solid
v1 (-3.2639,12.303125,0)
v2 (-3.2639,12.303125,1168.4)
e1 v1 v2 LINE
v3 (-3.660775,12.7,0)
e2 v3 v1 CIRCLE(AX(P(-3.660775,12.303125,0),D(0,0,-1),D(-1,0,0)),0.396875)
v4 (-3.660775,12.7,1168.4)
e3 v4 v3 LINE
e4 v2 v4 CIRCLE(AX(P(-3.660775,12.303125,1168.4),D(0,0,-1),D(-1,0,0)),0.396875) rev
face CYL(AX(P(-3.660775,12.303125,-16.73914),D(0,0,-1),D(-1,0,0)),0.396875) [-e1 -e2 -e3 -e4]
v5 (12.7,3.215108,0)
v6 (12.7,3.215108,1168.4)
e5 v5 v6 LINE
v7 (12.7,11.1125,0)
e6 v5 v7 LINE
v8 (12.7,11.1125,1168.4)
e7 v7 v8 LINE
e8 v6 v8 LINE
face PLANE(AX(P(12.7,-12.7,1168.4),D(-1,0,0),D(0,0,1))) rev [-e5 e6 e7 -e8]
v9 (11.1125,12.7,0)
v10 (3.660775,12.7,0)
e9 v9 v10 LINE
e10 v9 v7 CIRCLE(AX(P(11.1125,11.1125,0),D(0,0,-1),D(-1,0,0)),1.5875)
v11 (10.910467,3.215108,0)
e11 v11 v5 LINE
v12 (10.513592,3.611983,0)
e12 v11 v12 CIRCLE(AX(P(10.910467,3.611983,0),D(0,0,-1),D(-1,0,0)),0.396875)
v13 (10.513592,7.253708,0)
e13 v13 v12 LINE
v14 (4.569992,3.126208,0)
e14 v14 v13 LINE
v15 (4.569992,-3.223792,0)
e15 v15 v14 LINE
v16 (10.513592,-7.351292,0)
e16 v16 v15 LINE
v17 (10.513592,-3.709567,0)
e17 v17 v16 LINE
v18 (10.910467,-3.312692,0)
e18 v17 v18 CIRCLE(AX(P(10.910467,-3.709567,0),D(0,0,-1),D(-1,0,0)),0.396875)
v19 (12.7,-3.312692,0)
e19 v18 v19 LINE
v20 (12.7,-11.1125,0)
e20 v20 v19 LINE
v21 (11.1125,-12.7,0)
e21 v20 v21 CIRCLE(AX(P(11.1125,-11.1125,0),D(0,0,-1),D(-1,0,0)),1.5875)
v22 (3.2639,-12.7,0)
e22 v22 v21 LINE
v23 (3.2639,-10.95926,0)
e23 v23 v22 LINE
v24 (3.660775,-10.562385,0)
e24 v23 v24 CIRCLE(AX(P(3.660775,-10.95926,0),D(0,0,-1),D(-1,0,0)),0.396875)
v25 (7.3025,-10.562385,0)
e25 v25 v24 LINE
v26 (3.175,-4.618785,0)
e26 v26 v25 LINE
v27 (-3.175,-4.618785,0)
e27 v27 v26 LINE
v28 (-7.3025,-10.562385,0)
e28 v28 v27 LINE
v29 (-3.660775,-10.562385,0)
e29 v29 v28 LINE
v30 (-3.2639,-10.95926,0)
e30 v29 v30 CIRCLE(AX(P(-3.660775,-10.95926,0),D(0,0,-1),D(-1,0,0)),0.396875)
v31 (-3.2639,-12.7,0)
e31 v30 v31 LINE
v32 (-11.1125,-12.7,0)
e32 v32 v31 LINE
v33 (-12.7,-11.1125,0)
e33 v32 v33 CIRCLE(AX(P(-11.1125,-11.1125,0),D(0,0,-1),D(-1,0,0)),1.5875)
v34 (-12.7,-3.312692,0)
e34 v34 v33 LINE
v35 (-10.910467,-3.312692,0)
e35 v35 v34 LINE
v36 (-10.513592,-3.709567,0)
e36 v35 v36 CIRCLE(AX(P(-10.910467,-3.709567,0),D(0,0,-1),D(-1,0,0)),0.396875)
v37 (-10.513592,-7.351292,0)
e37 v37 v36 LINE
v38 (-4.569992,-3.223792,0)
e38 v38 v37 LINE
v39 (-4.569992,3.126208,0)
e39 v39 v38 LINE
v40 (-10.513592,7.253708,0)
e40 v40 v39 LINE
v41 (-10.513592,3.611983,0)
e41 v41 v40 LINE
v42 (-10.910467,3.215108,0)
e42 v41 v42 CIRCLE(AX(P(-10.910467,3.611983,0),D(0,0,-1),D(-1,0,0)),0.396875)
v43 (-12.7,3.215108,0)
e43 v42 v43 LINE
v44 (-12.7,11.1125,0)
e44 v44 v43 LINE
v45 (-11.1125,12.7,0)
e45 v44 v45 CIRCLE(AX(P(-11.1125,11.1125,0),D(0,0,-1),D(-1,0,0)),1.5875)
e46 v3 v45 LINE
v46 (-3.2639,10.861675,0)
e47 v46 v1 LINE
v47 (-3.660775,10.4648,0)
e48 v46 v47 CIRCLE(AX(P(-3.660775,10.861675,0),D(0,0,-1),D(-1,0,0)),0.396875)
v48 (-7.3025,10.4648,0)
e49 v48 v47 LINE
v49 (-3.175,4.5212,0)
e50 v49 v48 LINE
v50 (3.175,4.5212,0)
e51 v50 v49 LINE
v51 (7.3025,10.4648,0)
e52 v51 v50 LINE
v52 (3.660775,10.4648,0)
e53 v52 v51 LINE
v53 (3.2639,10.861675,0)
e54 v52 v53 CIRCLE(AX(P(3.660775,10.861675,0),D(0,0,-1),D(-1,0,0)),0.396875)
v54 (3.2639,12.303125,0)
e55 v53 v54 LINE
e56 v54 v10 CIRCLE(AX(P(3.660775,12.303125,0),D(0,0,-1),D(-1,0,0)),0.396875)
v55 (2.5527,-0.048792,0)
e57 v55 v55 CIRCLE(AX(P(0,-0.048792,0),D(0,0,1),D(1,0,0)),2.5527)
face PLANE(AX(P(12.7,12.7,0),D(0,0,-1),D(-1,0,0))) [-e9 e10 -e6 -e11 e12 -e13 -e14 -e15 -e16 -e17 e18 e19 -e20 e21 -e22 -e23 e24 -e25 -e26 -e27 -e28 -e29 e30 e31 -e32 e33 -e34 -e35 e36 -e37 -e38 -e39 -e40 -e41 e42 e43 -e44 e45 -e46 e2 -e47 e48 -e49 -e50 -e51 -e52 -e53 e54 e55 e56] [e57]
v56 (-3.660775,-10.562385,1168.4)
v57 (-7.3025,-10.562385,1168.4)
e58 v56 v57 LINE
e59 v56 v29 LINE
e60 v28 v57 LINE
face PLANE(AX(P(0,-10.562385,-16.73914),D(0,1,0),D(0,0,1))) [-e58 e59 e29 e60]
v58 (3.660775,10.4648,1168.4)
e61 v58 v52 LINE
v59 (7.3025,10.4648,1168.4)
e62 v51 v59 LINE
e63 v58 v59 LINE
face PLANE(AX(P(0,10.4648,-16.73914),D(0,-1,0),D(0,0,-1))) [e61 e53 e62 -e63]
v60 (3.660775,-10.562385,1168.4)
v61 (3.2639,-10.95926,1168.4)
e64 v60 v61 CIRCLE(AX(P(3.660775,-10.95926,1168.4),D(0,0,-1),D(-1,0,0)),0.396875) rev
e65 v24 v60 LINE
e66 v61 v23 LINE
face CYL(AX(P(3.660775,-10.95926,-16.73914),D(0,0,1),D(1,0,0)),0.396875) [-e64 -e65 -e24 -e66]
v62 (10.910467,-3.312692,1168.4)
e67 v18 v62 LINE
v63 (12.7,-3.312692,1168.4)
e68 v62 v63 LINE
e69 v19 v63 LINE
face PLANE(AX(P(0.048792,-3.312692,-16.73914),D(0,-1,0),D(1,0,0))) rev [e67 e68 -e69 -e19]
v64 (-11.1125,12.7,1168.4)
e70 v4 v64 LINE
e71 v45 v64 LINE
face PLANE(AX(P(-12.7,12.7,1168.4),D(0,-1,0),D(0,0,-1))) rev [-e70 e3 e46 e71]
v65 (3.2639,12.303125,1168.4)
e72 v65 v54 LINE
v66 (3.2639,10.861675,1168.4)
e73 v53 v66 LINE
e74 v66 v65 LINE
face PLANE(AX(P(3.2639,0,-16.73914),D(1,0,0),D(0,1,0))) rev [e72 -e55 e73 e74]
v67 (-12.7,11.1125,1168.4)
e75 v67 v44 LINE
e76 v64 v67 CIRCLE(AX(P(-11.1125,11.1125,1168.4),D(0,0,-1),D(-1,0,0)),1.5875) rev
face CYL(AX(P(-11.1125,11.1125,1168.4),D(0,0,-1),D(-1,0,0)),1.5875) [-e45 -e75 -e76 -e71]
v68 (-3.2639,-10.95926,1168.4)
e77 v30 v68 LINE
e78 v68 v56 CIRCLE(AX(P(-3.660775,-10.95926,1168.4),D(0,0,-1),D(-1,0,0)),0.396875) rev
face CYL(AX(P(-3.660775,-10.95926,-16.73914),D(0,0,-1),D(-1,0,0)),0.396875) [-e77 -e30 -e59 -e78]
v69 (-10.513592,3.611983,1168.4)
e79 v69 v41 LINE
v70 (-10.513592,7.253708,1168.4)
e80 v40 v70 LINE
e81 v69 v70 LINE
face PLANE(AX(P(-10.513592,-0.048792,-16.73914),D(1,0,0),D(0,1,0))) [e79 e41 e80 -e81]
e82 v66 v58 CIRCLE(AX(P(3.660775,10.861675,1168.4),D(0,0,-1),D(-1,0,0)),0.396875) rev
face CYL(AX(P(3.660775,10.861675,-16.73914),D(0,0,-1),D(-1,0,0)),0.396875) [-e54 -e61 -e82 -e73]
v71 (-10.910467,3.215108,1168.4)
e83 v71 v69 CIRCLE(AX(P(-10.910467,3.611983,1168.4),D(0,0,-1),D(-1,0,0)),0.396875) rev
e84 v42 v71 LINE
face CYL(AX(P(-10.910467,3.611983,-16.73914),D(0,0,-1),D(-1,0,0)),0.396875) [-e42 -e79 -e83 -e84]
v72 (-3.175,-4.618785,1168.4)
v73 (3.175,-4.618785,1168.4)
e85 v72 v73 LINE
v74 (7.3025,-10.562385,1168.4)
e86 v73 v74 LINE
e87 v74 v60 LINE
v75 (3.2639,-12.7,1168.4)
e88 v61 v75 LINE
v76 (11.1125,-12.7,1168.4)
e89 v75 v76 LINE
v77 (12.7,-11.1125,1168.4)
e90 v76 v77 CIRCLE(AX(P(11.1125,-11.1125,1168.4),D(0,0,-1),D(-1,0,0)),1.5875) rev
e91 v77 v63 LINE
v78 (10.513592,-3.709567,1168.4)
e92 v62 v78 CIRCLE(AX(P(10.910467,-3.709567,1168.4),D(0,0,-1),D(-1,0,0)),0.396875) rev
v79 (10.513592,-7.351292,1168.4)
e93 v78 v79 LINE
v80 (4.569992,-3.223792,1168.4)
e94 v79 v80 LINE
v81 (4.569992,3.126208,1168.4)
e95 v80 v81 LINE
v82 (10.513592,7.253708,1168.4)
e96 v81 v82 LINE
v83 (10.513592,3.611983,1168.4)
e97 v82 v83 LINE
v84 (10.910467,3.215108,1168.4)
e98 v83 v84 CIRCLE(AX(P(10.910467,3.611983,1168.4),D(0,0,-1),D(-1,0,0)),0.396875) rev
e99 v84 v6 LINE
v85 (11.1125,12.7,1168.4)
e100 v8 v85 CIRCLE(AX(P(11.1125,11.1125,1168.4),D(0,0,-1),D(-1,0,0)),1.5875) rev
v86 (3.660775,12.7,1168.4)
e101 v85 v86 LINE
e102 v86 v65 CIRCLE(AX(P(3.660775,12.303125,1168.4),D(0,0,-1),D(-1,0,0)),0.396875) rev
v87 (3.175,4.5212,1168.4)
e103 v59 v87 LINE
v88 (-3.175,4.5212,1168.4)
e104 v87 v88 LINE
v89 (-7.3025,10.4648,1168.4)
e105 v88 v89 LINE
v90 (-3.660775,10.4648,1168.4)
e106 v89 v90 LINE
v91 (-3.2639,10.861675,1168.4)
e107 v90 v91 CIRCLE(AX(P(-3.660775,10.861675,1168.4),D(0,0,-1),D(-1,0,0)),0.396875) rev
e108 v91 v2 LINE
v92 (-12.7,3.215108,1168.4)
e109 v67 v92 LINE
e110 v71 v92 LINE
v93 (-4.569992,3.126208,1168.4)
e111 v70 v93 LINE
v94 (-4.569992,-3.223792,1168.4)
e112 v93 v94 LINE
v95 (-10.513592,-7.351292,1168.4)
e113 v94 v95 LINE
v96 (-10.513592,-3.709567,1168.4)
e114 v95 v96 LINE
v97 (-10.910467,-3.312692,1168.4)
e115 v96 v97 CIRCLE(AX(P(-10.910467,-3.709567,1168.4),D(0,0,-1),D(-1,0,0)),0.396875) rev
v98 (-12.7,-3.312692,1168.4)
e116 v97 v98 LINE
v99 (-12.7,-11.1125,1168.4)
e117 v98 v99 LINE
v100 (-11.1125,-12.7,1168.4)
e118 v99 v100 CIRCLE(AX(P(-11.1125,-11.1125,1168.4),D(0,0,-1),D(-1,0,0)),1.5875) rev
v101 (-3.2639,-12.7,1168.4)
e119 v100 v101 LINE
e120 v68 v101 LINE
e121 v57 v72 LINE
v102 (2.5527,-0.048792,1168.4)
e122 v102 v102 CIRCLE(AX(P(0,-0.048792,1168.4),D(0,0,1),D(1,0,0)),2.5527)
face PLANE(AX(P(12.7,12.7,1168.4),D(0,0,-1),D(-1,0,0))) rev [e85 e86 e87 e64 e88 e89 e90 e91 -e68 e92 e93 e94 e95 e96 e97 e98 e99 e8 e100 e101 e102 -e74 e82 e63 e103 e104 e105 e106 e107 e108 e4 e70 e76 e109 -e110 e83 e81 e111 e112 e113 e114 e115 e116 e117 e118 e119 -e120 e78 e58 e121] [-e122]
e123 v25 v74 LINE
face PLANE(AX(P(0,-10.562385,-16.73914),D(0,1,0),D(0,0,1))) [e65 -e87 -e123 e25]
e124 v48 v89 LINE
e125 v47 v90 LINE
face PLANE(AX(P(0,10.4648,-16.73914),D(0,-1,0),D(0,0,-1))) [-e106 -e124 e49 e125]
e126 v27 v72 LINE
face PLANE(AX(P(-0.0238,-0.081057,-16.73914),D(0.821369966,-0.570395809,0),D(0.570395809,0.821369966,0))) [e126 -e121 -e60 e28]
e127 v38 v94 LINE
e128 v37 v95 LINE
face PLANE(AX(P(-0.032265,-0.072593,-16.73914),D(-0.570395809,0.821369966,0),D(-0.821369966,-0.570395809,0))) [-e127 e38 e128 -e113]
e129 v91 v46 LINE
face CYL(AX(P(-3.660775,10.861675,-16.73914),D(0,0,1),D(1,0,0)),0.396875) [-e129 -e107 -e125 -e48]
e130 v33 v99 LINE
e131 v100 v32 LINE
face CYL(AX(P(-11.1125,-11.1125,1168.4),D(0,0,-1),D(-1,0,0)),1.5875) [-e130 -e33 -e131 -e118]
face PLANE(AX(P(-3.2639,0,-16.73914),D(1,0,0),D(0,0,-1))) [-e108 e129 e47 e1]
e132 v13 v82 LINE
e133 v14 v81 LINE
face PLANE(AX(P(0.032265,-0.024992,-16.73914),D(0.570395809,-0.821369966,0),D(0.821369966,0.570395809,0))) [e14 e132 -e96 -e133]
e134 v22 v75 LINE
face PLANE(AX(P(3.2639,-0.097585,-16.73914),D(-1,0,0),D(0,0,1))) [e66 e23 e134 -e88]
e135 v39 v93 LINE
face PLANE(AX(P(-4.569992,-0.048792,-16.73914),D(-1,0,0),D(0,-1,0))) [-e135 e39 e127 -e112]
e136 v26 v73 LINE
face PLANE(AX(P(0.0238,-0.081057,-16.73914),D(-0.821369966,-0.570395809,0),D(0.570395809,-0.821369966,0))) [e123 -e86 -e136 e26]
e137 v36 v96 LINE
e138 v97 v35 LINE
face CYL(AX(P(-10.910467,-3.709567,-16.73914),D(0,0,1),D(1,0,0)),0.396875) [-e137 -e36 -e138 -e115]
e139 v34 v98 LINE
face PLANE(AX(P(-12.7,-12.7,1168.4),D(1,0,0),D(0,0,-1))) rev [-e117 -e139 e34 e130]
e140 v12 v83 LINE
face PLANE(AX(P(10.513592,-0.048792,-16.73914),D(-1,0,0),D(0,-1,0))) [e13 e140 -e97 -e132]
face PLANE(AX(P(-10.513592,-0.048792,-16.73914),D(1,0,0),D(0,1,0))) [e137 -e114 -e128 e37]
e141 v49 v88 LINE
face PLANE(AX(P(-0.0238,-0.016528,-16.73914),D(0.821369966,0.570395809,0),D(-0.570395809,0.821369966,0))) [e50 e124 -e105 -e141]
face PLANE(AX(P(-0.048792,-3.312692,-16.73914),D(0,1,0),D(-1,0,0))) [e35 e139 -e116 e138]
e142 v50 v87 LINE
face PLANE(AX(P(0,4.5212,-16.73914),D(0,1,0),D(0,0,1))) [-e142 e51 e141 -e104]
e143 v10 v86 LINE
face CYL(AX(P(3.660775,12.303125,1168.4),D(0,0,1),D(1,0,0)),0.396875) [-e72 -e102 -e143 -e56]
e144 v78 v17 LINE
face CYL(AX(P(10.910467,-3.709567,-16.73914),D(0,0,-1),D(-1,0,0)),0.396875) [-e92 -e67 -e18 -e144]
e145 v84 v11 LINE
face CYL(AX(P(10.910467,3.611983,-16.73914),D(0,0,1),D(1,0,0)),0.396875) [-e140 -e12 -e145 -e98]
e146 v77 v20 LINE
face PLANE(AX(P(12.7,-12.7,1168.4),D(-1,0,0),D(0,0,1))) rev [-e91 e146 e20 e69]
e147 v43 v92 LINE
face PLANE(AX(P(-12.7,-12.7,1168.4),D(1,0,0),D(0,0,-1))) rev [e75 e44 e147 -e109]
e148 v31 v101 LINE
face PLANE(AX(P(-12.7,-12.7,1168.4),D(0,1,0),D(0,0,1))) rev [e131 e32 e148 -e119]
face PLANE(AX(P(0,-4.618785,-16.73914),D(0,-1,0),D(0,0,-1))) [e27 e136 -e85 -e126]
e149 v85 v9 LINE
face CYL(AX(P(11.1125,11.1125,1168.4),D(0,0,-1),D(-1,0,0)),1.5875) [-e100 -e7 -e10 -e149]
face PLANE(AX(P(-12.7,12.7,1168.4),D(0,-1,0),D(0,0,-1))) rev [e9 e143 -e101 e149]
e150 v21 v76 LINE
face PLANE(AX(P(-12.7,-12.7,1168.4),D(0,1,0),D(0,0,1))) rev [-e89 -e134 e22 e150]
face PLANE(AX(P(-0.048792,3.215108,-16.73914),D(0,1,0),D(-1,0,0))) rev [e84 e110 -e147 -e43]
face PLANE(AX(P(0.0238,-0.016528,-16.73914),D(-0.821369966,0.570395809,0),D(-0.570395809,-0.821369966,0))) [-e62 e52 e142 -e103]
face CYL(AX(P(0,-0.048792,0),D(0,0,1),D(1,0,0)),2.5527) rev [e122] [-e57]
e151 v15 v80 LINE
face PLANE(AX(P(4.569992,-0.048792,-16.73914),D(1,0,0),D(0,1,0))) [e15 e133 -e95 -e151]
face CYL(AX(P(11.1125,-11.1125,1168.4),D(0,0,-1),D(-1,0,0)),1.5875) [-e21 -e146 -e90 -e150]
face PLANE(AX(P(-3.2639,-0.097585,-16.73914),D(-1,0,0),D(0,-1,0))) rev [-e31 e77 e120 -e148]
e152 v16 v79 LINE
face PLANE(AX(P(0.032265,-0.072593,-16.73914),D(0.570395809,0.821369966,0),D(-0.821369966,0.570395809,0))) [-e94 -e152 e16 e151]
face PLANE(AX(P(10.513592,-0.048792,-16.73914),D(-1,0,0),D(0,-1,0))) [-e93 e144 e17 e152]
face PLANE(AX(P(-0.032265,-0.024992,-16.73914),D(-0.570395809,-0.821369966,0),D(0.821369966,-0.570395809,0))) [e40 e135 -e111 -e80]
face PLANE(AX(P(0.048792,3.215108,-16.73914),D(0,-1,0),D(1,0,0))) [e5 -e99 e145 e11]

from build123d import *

# Parameters (mm, degrees)
SKETCH1_W           = 25.4
SKETCH1_H           = 25.4
BOSS_EXTRUDE1_DEPTH = 1168.4
FILLET1_R           = 1.5875
HOLE1_OUTLINE_R     = 2.5527
HOLE1_DEPTH         = 1168.4
SKETCH7_W           = 6.5278
SKETCH7_H           = 2.2352
CUT_EXTRUDE2_DEPTH  = 1168.4
FILLET4_R           = 0.396875
CIRPATTERN2_DEPTH   = 1168.4


# Read off the part's stored shape, not the designer's step: Hole1, CirPattern2
with BuildPart() as part:
    # Sketch1 → Boss-Extrude1 (new body)
    with BuildSketch(Plane.XY):
        Rectangle(SKETCH1_W, SKETCH1_H)
    extrude(amount=BOSS_EXTRUDE1_DEPTH)

    # Fillet1
    fillet1_edges = [part.edges().sort_by_distance(p)[0] for p in [
        (12.7, -12.7, 584.2),
        (-12.7, -12.7, 584.2),
        (-12.7, 12.7, 584.2),
        (12.7, 12.7, 584.2),
    ]]
    fillet(fillet1_edges, radius=FILLET1_R)

    # Hole1 outline → Hole1 (cut)
    with BuildSketch(Plane.XY):
        with Locations((0, -0.048792482)):
            Circle(HOLE1_OUTLINE_R)
    extrude(amount=HOLE1_DEPTH, mode=Mode.SUBTRACT)

    # Sketch7 → Cut-Extrude2 (cut)
    with BuildSketch(Plane.XY.offset(1168.4)):
        with Locations((0, 11.5824)):
            Rectangle(SKETCH7_W, SKETCH7_H)
        Polygon((-3.175, 4.5212), (-7.3025, 10.4648), (7.3025, 10.4648), (3.175, 4.5212), align=None)
    extrude(amount=-CUT_EXTRUDE2_DEPTH, mode=Mode.SUBTRACT)

    # Fillet4
    fillet4_edges = [part.edges().sort_by_distance(p)[0] for p in [
        (-3.2639, 10.4648, 584.2),
        (-3.2639, 12.7, 584.2),
        (3.2639, 12.7, 584.2),
        (3.2639, 10.4648, 584.2),
    ]]
    fillet(fillet4_edges, radius=FILLET4_R)

    # CirPattern2 outline → CirPattern2 (cut)
    with BuildSketch(Plane.XY):
        with BuildLine():
            ThreePointArc((-3.660775, -10.562384964), (-3.380141996, -10.67862696), (-3.2639, -10.959259964))
            Line((-3.2639, -10.959259964), (-3.2639, -12.7))
            Line((-3.2639, -12.7), (3.2639, -12.7))
            Line((3.2639, -12.7), (3.2639, -10.959259964))
            ThreePointArc((3.2639, -10.959259964), (3.380141996, -10.67862696), (3.660775, -10.562384964))
            Line((3.660775, -10.562384964), (7.3025, -10.562384964))
            Line((7.3025, -10.562384964), (3.175, -4.618784964))
            Line((3.175, -4.618784964), (-3.175, -4.618784964))
            Line((-3.175, -4.618784964), (-7.3025, -10.562384964))
            Line((-7.3025, -10.562384964), (-3.660775, -10.562384964))
        make_face()
        with BuildLine():
            Line((-12.7, -3.312692482), (-10.910467482, -3.312692482))
            ThreePointArc((-10.910467482, -3.312692482), (-10.629834478, -3.428934478), (-10.513592482, -3.709567482))
            Line((-10.513592482, -3.709567482), (-10.513592482, -7.351292482))
            Line((-10.513592482, -7.351292482), (-4.569992482, -3.223792482))
            Line((-4.569992482, -3.223792482), (-4.569992482, 3.126207518))
            Line((-4.569992482, 3.126207518), (-10.513592482, 7.253707518))
            Line((-10.513592482, 7.253707518), (-10.513592482, 3.611982518))
            ThreePointArc((-10.513592482, 3.611982518), (-10.629834478, 3.331349514), (-10.910467482, 3.215107518))
            Line((-10.910467482, 3.215107518), (-12.7, 3.215107518))
            Line((-12.7, 3.215107518), (-12.7, -3.312692482))
        make_face()
        with BuildLine():
            ThreePointArc((10.513592482, -3.709567482), (10.629834478, -3.428934478), (10.910467482, -3.312692482))
            Line((10.910467482, -3.312692482), (12.7, -3.312692482))
            Line((12.7, -3.312692482), (12.7, 3.215107518))
            Line((12.7, 3.215107518), (10.910467482, 3.215107518))
            ThreePointArc((10.910467482, 3.215107518), (10.629834478, 3.331349514), (10.513592482, 3.611982518))
            Line((10.513592482, 3.611982518), (10.513592482, 7.253707518))
            Line((10.513592482, 7.253707518), (4.569992482, 3.126207518))
            Line((4.569992482, 3.126207518), (4.569992482, -3.223792482))
            Line((4.569992482, -3.223792482), (10.513592482, -7.351292482))
            Line((10.513592482, -7.351292482), (10.513592482, -3.709567482))
        make_face()
    extrude(amount=CIRPATTERN2_DEPTH, mode=Mode.SUBTRACT)


solid = part.part
